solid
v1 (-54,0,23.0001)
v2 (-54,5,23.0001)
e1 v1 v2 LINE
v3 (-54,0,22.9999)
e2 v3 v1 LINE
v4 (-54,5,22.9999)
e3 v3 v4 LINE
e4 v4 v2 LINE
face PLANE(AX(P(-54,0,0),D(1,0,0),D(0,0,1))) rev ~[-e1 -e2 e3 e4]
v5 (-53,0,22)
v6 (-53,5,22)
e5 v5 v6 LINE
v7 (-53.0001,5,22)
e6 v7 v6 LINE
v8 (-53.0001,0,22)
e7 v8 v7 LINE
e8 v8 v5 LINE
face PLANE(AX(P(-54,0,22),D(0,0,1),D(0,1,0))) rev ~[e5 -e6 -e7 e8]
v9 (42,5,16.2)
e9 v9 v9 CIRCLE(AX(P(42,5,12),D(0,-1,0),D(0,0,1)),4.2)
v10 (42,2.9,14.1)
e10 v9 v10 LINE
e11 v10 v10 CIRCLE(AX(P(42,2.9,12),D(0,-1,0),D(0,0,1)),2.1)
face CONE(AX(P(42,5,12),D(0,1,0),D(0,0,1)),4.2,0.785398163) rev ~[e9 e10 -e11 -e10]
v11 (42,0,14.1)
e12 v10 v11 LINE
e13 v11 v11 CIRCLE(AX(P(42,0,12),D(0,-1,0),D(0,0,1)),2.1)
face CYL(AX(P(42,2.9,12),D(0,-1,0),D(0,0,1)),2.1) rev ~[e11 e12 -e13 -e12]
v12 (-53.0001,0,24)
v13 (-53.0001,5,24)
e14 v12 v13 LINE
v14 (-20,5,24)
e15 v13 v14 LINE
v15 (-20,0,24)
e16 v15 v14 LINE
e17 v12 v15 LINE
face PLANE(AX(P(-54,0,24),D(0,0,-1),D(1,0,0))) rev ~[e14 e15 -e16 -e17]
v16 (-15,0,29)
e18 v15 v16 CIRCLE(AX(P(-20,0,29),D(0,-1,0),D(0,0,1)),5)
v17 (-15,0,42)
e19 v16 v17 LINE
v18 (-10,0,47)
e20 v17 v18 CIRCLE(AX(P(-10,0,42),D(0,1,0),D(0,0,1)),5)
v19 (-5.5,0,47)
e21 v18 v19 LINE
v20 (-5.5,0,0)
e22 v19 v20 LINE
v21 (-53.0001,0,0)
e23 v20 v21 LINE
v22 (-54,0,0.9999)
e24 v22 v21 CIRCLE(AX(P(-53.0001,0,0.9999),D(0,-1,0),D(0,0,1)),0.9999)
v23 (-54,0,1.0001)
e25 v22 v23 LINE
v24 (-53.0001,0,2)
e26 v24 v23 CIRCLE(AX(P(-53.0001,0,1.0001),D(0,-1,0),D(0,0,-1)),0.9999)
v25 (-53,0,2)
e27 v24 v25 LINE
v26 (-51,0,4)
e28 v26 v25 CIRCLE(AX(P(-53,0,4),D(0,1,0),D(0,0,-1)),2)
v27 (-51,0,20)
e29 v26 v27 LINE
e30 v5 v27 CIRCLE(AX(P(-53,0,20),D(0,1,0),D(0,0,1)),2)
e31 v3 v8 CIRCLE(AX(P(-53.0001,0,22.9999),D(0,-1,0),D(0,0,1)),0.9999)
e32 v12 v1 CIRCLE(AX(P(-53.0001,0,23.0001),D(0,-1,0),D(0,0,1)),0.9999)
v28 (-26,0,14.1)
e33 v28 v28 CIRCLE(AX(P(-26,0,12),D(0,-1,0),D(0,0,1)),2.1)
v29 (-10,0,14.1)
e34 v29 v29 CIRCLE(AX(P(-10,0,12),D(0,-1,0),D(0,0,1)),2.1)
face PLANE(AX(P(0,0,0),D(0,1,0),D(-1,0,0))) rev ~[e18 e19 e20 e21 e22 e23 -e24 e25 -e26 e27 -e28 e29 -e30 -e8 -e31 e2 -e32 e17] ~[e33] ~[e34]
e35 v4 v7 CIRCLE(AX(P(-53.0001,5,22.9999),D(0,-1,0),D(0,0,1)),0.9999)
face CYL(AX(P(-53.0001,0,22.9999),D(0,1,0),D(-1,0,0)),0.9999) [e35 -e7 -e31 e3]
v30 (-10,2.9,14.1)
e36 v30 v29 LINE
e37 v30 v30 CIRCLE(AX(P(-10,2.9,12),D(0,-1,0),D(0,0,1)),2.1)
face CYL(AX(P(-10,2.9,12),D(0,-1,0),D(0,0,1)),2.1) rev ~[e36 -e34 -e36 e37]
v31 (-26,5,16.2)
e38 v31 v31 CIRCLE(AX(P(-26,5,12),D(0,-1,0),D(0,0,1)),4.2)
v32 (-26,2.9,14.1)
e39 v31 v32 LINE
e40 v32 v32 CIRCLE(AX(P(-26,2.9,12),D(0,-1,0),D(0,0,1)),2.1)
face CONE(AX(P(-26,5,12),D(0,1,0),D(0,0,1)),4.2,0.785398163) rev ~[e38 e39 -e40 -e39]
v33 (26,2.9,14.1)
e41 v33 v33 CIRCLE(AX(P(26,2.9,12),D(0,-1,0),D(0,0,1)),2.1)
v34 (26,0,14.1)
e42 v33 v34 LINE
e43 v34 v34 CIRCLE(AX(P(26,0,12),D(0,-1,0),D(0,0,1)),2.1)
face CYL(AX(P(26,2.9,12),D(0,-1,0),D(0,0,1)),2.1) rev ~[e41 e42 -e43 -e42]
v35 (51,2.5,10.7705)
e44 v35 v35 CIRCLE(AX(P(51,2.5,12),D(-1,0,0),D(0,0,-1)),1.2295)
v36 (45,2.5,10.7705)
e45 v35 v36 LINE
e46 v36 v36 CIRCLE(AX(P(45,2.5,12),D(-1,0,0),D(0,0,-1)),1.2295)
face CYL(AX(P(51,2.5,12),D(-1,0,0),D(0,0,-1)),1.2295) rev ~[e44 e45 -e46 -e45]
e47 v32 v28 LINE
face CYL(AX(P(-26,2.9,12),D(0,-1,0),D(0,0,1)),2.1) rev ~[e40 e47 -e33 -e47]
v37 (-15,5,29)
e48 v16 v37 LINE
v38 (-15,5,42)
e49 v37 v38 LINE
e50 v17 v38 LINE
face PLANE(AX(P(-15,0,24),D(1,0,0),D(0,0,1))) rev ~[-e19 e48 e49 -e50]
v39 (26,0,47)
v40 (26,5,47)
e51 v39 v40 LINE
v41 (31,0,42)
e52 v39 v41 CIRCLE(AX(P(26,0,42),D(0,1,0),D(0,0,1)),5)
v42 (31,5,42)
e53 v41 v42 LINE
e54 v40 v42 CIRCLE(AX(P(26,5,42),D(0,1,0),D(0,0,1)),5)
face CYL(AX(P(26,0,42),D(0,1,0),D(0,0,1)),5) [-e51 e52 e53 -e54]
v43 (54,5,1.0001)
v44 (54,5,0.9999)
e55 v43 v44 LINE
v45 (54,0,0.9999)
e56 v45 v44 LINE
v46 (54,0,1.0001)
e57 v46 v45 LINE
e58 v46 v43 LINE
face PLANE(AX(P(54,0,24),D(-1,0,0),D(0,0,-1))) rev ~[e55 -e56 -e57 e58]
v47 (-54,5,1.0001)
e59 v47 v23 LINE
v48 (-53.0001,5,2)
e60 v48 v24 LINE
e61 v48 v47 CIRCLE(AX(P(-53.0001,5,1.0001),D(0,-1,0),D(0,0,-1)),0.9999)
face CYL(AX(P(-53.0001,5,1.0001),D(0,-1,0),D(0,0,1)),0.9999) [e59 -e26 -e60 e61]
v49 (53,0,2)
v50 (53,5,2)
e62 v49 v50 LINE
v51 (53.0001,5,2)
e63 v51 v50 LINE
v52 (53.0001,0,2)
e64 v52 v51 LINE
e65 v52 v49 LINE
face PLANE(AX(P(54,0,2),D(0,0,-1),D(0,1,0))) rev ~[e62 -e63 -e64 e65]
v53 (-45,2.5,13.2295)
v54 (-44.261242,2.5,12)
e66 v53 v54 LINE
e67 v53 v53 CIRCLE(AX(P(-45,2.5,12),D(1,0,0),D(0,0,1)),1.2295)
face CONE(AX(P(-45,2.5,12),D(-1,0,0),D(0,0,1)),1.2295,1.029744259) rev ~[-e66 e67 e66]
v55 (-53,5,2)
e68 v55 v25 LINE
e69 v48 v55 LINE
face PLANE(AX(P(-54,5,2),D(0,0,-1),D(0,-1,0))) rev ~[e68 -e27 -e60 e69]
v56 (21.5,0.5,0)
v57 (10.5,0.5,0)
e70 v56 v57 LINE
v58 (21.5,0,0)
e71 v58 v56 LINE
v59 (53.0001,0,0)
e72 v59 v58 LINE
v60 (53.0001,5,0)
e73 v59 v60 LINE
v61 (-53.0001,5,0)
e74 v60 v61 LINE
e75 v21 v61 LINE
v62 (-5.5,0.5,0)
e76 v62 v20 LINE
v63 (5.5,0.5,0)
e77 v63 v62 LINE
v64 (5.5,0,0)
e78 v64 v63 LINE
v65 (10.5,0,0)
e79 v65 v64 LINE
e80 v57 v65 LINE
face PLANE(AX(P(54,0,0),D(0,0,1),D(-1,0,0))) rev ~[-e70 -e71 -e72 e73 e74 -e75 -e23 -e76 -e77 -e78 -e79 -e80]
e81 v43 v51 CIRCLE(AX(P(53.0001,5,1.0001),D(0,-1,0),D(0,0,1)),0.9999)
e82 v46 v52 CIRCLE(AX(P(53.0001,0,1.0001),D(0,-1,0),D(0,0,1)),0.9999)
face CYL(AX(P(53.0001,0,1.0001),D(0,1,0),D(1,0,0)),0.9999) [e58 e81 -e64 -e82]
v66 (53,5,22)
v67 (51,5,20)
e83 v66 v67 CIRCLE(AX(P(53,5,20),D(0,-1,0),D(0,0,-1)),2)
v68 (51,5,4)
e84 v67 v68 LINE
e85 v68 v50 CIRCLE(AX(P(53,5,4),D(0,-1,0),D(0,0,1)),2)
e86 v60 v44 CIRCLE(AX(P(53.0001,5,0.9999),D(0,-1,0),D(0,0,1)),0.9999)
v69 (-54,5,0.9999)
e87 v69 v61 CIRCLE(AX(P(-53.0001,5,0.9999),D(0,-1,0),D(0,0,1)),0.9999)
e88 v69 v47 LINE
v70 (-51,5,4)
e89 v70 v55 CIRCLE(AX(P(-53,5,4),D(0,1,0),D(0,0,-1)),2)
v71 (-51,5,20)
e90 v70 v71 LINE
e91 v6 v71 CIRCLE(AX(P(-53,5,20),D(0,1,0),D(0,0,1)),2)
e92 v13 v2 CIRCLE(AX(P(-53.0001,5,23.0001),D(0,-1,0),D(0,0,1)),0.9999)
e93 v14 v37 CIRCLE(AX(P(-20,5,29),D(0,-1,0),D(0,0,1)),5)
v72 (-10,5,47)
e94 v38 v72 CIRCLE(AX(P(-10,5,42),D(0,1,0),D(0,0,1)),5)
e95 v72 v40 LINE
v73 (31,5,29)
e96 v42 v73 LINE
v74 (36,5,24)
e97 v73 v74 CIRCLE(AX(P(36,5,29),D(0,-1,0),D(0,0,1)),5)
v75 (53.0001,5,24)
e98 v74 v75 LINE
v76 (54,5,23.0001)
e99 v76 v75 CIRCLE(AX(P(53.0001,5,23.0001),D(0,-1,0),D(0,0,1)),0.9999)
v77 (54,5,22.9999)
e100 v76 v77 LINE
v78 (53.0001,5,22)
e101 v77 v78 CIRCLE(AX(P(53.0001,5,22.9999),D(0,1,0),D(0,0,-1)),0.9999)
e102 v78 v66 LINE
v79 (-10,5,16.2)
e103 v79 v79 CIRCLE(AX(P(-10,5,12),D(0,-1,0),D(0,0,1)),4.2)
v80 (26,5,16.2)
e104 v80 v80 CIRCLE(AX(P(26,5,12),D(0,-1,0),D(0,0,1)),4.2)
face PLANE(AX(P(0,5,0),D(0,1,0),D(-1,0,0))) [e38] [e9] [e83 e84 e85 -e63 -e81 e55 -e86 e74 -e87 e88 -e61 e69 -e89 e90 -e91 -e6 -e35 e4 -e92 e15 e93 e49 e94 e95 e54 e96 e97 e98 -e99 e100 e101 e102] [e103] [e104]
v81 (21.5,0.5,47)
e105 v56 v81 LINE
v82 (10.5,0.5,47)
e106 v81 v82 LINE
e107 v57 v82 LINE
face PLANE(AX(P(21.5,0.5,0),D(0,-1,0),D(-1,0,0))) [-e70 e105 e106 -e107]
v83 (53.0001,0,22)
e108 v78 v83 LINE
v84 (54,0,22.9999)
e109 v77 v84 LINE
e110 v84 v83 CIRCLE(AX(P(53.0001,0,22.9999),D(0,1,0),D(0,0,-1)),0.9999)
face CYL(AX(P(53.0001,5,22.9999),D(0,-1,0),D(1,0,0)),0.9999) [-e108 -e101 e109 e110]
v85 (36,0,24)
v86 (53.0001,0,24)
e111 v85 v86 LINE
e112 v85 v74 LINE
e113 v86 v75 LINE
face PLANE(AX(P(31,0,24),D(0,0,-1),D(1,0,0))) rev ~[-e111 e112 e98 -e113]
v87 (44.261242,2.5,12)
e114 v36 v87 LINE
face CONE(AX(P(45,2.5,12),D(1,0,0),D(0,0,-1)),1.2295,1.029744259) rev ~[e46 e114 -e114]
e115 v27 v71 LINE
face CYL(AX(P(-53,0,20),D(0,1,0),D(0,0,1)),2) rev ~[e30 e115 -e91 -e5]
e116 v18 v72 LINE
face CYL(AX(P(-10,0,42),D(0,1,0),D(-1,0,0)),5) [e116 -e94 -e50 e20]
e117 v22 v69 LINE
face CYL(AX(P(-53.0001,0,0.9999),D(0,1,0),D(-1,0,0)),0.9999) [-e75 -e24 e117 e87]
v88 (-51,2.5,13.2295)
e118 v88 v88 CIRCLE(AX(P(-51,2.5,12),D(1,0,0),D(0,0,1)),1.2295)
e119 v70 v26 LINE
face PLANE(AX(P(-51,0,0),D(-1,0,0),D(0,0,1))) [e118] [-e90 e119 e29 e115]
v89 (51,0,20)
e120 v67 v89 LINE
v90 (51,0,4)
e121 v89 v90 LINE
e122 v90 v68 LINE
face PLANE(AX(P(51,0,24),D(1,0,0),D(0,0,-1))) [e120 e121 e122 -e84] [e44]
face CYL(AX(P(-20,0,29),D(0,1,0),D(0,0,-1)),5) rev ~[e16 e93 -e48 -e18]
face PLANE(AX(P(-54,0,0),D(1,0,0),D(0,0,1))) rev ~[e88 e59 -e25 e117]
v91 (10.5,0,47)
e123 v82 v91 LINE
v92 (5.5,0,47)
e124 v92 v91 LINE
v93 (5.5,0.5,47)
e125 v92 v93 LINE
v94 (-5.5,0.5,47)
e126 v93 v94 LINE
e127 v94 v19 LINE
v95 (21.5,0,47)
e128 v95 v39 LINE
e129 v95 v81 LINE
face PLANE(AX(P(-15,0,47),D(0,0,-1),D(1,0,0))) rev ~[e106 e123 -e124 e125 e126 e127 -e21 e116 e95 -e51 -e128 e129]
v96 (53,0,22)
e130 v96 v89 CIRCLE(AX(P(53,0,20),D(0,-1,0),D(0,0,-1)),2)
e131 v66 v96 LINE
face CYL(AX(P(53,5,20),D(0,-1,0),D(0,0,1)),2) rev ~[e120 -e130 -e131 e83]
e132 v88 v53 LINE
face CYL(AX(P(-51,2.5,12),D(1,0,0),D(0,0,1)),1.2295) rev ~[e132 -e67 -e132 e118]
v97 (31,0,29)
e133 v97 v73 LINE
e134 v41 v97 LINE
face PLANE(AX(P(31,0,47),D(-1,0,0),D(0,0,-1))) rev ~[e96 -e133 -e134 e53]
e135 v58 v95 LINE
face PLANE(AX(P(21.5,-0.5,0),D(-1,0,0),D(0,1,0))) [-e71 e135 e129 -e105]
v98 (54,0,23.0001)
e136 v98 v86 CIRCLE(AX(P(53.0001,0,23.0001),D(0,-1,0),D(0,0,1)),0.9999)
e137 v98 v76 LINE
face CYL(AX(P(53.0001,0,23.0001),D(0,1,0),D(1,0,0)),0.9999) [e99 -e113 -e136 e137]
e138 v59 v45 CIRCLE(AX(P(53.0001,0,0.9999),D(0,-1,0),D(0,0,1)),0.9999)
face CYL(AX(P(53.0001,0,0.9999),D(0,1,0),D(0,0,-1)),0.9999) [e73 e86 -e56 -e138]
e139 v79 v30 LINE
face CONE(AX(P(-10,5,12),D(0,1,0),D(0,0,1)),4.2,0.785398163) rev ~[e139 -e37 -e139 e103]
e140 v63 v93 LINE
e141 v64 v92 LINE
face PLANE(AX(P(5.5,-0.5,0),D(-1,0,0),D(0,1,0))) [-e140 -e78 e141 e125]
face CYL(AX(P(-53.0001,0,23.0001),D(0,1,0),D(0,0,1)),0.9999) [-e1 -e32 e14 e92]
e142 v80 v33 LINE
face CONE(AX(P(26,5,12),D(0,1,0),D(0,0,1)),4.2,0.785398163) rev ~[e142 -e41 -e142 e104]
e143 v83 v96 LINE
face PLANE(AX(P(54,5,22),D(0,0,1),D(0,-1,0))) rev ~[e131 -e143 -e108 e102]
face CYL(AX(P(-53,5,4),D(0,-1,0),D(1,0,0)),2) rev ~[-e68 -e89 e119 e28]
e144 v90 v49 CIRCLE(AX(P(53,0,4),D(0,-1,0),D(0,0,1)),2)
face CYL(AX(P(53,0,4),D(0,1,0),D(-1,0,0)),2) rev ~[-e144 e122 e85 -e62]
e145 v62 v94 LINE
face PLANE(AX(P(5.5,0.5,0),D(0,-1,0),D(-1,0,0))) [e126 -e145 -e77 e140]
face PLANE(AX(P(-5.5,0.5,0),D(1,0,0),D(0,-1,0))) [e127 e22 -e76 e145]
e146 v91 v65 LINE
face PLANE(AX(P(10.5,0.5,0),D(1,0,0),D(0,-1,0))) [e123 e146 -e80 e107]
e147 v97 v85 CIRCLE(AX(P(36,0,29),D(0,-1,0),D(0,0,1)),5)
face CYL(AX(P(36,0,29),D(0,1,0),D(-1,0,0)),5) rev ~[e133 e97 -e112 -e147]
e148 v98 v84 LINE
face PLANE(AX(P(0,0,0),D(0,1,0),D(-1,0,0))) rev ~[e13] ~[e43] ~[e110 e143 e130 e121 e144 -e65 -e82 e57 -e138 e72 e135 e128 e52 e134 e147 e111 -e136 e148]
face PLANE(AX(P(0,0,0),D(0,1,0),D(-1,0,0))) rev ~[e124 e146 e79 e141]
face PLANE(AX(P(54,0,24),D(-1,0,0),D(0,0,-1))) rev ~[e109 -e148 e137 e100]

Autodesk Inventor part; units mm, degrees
ref_plane "YZ Plane" through (0, 0, 0) normal (1, 0, 0) x (0, 1, 0)
ref_plane "XZ Plane" through (0, 0, 0) normal (0, 1, 0) x (-1, 0, 0)
sketch "Skizze1" plane through (0, 0, 0) normal (0, 1, 0) x (-1, 0, 0)
  line L0 (-54, 0) -> (54, 0)
  line L1 (54, 0) -> (54, 24)
  line L2 (54, 24) -> (15, 24)
  line L3 (15, 24) -> (15, 47)
  line L4 (15, 47) -> (-31, 47)
  line L5 (-31, 47) -> (-31, 24)
  line L6 (-31, 24) -> (-54, 24)
  line L7 (-54, 24) -> (-54, 0)
  point P0 (0, 0)
  point P1 (0, 0)
  dimension "d0" = 108
  dimension "d1" = 24
  dimension "d2" = 39
  dimension "d3" = 23
  dimension "d59" = 23
extrude "Extrusion1" add sketch "Skizze1" along normal blind 5
sketch "Skizze2" plane through (54, 0, 24) normal (1, 0, 0) x (0, 0, -1)
  line L0 (0, 0) -> (24, 0) projected
  line L1 (24, 0) -> (24, 5) projected
  line L2 (0, 5) -> (24, 5) projected
  line L3 (0, 0) -> (0, 5) projected
  line L4 (2, 0) -> (22, 0)
  line L5 (22, 0) -> (22, 5)
  line L6 (22, 5) -> (2, 5)
  line L7 (2, 5) -> (2, 0)
  dimension "d7" = 2
  dimension "d8" = 2
extrude "Extrusion2" cut sketch "Skizze2" against normal blind 3 contours L7 L2 L5 L0
sketch "Skizze3" plane through (-54, 0, 0) normal (-1, 0, 0) x (0, 0, 1)
  line L0 (0, 0) -> (24, 0) projected
  line L1 (24, 0) -> (24, 5) projected
  line L2 (0, 5) -> (24, 5) projected
  line L3 (0, 0) -> (0, 5) projected
  line L4 (2, 0) -> (22, 0)
  line L5 (22, 0) -> (22, 5)
  line L6 (22, 5) -> (2, 5)
  line L7 (2, 5) -> (2, 0)
  dimension "d11" = 2
  dimension "d12" = 2
extrude "Extrusion3" cut sketch "Skizze3" against normal blind 3 contours L7 L2 L5 L0
fillet "Rundung1" radius 1 8 edges at (-54, 2.5, 0) (-54, 2.5, 2) (-54, 2.5, 22) (-54, 2.5, 24) (54, 2.5, 24) (54, 2.5, 22) (54, 2.5, 2) (54, 2.5, 0)
fillet "Rundung2" radius 5 4 edges at (31, 2.5, 24) (31, 2.5, 47) (-15, 2.5, 47) (-15, 2.5, 24)
sketch "Skizze4" plane through (53, 0, 0) normal (0, 0, -1) x (-1, 0, 0)
  line L0 (58.5, -0.5) -> (47.5, -0.5)
  line L1 (47.5, -0.5) -> (47.5, 0.5)
  line L2 (47.5, 0.5) -> (58.5, 0.5)
  line L3 (58.5, 0.5) -> (58.5, -0.5)
  line L4 (58.5, -0.5) -> (47.5, 0.5) construction
  line L5 (47.5, -0.5) -> (58.5, 0.5) construction
  point P0 (53, 0)
  dimension "d17" = 11
  dimension "d18" = 1
extrude "Extrusion4" cut sketch "Skizze4" against normal through all
sketch "Skizze6" plane through (0, 5, 0) normal (0, 1, 0) x (1, 0, 0)
  line L0 (53, 0) -> (-53, 0) projected
  point P0 (0, 0)
  point P1 (-26, -12)
  point P2 (26, -12)
  dimension "d31" = 12
  dimension "d32" = 26
  dimension "d33" = 26
hole "Bohrung2" at (-26, 5, 12) at (26, 5, 12) direction (0, -1, 0) diameter 4.2 end through all countersink diameter 8.4 countersink angle 90
sketch "Skizze7" plane through (51, 0, 24) normal (1, 0, 0) x (0, 0, -1)
  line L0 (22, 5) -> (22, 0) projected
  line L1 (2, 5) -> (22, 5) projected
  point P0 (24, 0)
  point P1 (12, 2.5)
  dimension "d41" = 2.5
  dimension "d42" = 10
hole "Bohrung3" at (51, 2.5, 12) direction (-1, 0, 0) diameter 2.459 depth 6 tip angle 118 thread size "M3x0.5" class "6H" standard "ANSI Metric M Profile"
sketch "Skizze8" plane through (-51, 0, 0) normal (-1, 0, 0) x (0, 0, 1)
  line L0 (2, 5) -> (22, 5) projected
  line L1 (2, 0) -> (2, 5) projected
  point P0 (0, 0)
  point P1 (12, 2.5)
  dimension "d50" = 2.5
  dimension "d51" = 10
hole "Bohrung4" at (-51, 2.5, 12) direction (1, 0, 0) diameter 2.459 depth 6 tip angle 118 thread size "M3x0.5" class "6H" standard "ANSI Metric M Profile"
ref_plane "Arbeitsebene1" through (-51, 0, 12) normal (0, 0, -1) x (-1, 0, 0)
pattern_linear "Rechteckige Anordnung1" count 2 spacing 16 along (1, 0, 0) of "Extrusion4", "Bohrung2"
fillet "Rundung3" radius 2 4 edges at (51, 2.5, 22) (51, 2.5, 2) (-51, 2.5, 22) (-51, 2.5, 2)
properties part number "GrundplatteeThumbloop"
